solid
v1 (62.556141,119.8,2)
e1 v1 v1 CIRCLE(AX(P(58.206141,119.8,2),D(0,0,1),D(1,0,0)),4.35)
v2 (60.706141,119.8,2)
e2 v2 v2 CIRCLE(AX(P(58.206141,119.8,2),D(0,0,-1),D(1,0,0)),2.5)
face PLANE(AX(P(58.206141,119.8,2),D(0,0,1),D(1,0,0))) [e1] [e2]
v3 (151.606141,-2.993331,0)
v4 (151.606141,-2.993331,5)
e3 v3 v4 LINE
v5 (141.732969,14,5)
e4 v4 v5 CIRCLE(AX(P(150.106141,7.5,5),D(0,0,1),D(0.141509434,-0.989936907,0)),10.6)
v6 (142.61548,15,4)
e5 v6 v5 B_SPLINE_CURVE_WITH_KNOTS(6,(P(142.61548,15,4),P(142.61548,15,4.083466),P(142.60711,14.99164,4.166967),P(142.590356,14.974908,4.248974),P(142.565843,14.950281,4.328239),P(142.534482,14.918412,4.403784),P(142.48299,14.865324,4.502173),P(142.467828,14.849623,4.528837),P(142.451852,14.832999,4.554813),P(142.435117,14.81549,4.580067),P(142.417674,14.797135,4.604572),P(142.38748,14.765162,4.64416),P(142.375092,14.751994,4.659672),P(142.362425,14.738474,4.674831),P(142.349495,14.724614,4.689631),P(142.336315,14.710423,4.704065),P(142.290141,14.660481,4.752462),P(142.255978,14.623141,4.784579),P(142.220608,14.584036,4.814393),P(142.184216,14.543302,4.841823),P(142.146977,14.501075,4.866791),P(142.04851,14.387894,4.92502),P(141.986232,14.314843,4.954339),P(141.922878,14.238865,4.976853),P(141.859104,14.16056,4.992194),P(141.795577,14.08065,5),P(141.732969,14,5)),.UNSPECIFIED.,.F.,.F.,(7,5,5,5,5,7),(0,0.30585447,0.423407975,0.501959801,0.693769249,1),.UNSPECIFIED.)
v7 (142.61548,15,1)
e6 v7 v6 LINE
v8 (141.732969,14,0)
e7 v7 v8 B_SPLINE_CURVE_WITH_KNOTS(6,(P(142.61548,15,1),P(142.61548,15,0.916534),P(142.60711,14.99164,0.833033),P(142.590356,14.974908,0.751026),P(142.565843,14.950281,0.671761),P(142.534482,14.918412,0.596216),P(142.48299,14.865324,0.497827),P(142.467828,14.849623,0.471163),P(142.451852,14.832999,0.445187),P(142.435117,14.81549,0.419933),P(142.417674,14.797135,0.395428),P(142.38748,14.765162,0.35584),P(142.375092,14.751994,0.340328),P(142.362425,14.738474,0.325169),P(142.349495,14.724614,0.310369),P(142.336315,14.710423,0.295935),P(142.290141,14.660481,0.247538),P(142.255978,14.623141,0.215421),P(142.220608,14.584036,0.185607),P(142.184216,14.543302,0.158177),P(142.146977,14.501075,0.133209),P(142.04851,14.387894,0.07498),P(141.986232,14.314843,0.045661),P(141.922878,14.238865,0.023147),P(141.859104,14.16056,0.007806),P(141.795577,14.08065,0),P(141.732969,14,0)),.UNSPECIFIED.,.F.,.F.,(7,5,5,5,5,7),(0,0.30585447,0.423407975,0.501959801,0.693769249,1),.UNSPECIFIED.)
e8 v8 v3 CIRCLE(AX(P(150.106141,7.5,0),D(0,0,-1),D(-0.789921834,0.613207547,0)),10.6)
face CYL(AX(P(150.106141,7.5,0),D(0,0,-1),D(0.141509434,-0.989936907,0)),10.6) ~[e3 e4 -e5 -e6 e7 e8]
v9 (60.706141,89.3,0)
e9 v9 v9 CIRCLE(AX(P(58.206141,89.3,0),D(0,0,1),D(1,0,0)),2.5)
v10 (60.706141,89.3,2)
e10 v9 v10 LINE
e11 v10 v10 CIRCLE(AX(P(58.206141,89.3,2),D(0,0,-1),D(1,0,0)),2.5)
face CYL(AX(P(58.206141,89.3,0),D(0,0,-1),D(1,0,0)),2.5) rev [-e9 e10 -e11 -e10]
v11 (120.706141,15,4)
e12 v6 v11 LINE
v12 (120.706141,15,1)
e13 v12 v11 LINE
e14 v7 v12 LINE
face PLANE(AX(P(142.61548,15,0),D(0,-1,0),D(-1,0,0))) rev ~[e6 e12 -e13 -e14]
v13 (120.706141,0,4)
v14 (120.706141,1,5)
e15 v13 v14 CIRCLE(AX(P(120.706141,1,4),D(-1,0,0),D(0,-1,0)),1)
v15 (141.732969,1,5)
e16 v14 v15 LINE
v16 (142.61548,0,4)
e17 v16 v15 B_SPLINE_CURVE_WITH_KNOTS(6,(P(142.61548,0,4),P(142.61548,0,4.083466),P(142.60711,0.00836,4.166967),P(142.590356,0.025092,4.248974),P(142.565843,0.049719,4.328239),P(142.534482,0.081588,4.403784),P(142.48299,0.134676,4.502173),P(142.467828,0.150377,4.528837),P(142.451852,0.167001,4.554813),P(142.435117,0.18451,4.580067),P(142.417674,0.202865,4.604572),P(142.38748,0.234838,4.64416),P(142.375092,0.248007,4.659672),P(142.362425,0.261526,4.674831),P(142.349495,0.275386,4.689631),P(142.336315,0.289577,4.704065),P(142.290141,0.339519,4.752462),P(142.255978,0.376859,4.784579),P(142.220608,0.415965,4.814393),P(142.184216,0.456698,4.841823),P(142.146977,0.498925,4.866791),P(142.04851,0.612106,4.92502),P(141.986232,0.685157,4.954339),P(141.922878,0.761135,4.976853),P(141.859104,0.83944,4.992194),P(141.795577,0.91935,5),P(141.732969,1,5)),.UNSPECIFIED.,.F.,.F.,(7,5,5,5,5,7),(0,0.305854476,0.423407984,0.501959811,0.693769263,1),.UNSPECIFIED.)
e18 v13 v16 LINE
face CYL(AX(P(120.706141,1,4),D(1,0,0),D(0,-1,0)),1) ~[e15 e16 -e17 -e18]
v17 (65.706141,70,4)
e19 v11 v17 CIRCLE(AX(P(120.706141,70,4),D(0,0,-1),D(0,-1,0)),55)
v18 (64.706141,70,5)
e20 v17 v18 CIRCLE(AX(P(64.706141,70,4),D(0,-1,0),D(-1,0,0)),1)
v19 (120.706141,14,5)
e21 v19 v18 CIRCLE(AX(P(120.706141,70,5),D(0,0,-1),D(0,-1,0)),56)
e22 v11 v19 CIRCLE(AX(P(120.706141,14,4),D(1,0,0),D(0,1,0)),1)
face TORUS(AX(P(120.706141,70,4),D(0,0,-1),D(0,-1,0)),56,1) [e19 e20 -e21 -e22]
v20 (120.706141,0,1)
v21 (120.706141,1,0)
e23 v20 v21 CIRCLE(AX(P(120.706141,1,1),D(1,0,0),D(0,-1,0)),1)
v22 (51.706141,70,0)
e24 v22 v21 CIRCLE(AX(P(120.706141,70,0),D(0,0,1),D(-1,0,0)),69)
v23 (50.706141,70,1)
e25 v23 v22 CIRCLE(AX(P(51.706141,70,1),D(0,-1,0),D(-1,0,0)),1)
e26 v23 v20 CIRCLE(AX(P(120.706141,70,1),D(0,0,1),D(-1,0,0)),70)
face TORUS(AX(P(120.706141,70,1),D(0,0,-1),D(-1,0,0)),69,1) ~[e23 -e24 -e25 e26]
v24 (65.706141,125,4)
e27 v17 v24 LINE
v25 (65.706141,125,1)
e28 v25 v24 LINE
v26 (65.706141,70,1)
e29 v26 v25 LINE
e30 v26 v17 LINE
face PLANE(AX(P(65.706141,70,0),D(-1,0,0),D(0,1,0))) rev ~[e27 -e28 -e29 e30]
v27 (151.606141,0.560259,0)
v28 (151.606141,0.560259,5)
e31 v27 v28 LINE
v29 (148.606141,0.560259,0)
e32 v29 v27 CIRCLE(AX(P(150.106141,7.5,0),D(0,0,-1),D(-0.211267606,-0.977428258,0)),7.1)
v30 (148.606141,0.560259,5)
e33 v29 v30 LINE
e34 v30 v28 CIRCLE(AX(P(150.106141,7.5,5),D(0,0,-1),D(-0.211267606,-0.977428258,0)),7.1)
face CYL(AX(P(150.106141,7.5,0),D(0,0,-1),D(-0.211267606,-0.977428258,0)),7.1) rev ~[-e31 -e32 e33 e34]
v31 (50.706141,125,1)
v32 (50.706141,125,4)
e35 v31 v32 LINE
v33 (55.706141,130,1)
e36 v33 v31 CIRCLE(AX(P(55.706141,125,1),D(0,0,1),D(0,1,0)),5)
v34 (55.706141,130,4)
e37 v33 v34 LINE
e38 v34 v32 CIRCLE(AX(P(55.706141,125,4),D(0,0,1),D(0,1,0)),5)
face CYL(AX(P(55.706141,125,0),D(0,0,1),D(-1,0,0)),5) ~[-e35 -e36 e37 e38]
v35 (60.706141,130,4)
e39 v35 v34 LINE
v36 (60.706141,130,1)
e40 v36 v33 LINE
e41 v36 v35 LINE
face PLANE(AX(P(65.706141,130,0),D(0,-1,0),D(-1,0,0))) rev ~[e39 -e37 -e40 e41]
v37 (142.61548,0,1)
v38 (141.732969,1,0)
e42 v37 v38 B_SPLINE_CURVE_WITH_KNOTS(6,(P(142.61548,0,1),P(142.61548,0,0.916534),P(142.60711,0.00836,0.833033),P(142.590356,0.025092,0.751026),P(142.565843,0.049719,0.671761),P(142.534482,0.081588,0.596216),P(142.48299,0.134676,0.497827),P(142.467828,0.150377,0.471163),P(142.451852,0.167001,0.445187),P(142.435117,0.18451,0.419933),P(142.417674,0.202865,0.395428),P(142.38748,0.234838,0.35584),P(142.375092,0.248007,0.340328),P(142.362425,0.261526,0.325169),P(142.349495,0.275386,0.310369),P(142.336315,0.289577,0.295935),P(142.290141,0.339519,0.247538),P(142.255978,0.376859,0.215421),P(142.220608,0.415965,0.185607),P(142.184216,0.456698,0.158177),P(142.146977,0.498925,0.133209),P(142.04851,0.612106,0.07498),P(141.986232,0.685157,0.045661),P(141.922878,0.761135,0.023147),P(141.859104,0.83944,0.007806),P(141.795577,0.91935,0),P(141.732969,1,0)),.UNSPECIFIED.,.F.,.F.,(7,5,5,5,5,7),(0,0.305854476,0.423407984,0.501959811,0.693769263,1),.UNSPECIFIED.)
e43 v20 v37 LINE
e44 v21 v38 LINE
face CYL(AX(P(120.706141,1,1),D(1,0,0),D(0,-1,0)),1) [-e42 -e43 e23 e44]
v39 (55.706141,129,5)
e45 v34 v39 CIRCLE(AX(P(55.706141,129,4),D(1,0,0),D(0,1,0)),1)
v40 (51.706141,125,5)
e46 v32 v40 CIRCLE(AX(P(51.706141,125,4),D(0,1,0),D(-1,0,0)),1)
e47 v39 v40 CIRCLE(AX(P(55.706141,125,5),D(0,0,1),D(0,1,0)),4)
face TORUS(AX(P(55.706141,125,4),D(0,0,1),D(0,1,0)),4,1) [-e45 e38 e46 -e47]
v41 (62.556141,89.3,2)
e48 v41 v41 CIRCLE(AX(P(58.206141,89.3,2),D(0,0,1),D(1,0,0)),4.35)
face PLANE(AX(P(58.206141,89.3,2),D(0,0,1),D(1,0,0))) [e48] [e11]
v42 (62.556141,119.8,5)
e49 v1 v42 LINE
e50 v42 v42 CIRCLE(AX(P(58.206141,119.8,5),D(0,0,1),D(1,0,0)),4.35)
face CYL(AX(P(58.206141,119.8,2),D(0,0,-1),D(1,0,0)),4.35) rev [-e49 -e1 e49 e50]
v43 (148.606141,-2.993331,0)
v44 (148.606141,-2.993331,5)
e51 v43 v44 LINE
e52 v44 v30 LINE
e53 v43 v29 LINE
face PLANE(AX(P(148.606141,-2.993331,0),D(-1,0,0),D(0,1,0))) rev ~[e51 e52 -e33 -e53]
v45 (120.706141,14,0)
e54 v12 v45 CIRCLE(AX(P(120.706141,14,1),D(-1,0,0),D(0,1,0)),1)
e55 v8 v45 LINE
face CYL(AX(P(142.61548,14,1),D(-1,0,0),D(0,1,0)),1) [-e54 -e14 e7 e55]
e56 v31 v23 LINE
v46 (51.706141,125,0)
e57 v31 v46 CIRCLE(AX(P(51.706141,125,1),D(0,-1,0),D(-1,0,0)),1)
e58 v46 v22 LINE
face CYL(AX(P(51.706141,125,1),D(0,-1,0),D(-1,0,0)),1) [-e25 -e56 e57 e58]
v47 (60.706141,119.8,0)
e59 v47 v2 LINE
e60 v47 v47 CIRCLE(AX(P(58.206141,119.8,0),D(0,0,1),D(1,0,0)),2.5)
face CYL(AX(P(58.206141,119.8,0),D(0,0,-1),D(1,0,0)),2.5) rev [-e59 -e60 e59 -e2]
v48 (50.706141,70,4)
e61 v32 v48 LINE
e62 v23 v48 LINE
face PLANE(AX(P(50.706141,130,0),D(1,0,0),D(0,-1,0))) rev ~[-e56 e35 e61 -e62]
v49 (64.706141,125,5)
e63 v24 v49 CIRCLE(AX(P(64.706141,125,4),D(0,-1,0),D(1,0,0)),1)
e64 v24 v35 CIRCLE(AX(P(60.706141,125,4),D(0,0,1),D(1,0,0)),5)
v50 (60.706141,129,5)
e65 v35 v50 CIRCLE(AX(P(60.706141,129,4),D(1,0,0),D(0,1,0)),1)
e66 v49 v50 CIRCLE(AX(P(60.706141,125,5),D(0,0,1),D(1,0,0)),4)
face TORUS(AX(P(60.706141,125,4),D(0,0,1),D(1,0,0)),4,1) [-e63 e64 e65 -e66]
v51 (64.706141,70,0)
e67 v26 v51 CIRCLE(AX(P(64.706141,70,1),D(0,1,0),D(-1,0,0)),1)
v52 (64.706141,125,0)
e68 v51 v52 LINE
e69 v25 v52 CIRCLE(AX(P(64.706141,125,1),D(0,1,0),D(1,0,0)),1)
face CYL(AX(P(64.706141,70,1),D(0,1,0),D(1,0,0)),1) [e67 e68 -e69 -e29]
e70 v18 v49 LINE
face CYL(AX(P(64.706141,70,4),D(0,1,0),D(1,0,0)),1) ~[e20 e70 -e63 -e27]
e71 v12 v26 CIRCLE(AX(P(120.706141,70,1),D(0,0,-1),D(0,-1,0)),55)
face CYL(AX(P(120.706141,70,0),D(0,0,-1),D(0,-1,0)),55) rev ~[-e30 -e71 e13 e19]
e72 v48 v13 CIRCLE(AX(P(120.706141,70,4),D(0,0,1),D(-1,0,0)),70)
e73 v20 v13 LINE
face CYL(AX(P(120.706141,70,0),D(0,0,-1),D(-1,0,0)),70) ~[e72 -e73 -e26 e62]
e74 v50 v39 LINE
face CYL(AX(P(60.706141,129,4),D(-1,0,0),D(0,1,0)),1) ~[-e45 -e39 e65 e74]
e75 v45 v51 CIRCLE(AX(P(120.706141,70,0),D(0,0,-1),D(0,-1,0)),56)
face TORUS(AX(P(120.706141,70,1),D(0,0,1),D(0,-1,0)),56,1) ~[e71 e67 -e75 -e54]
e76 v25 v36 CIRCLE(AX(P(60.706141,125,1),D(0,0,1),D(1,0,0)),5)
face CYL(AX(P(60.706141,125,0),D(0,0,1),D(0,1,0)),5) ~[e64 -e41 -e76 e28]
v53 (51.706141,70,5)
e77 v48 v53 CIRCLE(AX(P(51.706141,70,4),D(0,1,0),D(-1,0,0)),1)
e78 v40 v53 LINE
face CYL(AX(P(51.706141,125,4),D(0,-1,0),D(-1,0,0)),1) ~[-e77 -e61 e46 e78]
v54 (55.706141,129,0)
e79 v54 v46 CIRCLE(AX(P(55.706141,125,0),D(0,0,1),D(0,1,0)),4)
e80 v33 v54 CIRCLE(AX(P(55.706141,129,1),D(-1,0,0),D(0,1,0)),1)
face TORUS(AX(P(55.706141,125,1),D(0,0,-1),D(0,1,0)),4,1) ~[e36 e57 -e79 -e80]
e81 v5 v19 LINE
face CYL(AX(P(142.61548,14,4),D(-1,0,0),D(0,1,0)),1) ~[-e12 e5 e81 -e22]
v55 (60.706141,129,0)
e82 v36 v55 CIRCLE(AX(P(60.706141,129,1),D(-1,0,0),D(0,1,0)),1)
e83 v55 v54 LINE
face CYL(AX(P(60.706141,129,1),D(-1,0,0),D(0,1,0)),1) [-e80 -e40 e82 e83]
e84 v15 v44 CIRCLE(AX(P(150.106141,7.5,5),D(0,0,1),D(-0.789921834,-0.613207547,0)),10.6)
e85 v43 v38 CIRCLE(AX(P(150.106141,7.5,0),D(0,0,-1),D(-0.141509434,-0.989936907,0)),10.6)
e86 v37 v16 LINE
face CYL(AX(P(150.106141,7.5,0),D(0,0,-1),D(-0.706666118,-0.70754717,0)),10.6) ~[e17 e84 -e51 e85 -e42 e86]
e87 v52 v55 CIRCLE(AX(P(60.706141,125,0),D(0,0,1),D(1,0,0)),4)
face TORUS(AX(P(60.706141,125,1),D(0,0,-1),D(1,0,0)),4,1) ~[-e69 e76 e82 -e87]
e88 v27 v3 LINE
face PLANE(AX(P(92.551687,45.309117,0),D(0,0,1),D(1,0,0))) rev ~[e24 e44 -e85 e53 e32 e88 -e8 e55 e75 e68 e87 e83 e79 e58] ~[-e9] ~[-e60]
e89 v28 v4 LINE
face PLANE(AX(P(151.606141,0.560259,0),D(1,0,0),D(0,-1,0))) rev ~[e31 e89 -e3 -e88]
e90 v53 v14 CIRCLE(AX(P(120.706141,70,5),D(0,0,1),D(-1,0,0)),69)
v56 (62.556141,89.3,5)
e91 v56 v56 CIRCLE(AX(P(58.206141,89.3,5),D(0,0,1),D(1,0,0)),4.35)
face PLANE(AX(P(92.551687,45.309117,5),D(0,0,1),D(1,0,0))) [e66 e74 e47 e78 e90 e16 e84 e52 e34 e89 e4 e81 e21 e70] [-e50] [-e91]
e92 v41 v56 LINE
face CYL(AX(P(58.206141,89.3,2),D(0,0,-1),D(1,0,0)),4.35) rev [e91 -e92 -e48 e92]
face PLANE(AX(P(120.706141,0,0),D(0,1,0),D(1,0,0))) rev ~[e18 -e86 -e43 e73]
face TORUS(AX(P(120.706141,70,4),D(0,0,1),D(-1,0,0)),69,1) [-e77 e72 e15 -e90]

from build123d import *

# Parameters (mm, degrees)
F0_R     = 2.5
F1_DEPTH = 5
F3_R     = 4.35
F4_DEPTH = 3
F5_R     = 5
F6_R     = 5
F7_R     = 1
F8_R     = 1


# Not quite as in the source:
# - a feature names something its author has since deleted; it is built from what else it names


with BuildPart() as f1:
    # F0 (on Top) → F1 (new body)
    with BuildSketch(Plane.XY):
        with BuildLine():
            Line((148.606140697, -2.9933312156), (148.606140697, 0.5602593708))
            ThreePointArc((148.606140697, 0.5602593708), (150.106140697, 14.6), (151.606140697, 0.5602593708))
            Line((151.606140697, 0.5602593708), (151.606140697, -2.9933312156))
            ThreePointArc((151.606140697, -2.9933312156), (159.5883343472, 12.2379324162), (142.615479845, 15))
            Line((142.615479845, 15), (120.706140697, 15))
            ThreePointArc((120.706140697, 15), (81.8152677317, 31.1091270347), (65.706140697, 70))
            Line((65.706140697, 70), (65.706140697, 130))
            Line((65.706140697, 130), (50.706140697, 130))
            Line((50.706140697, 130), (50.706140697, 70))
            ThreePointArc((50.706140697, 70), (71.2086660139, 20.5025253169), (120.706140697, 0))
            Line((120.706140697, 0), (142.615479845, 0))
            ThreePointArc((142.615479845, 0), (145.3682082808, -1.9821936502), (148.606140697, -2.9933312156))
        make_face()
        with Locations((58.206140697, 89.3)):
            Circle(F0_R, mode=Mode.SUBTRACT)
        with Locations((58.206140697, 119.8)):
            Circle(F0_R, mode=Mode.SUBTRACT)
    extrude(amount=F1_DEPTH)

    # F3 (on offset) → F4 (cut, through all)
    with BuildSketch(Plane.XY.offset(2)):
        with Locations((58.206140697, 119.8)):
            Circle(F3_R)
        with Locations((58.206140697, 89.3)):
            Circle(F3_R)
    extrude(amount=F4_DEPTH, mode=Mode.SUBTRACT)

    # F5
    f5_edges = [f1.edges().sort_by_distance(p)[0] for p in [
        (50.706141, 130, 2.5),
    ]]
    fillet(f5_edges, radius=F5_R)

    # F6
    f6_edges = [f1.edges().sort_by_distance(p)[0] for p in [
        (65.706141, 130, 2.5),
    ]]
    fillet(f6_edges, radius=F6_R)

    # F7
    f7_edges = [f1.edges().sort_by_distance(p)[0] for p in [
        (50.706141, 97.5, 5),
    ]]
    fillet(f7_edges, radius=F7_R)

    # F8
    f8_edges = [f1.edges().sort_by_distance(p)[0] for p in [
        (50.706141, 97.5, 0),
    ]]
    fillet(f8_edges, radius=F8_R)


solid = f1.part
